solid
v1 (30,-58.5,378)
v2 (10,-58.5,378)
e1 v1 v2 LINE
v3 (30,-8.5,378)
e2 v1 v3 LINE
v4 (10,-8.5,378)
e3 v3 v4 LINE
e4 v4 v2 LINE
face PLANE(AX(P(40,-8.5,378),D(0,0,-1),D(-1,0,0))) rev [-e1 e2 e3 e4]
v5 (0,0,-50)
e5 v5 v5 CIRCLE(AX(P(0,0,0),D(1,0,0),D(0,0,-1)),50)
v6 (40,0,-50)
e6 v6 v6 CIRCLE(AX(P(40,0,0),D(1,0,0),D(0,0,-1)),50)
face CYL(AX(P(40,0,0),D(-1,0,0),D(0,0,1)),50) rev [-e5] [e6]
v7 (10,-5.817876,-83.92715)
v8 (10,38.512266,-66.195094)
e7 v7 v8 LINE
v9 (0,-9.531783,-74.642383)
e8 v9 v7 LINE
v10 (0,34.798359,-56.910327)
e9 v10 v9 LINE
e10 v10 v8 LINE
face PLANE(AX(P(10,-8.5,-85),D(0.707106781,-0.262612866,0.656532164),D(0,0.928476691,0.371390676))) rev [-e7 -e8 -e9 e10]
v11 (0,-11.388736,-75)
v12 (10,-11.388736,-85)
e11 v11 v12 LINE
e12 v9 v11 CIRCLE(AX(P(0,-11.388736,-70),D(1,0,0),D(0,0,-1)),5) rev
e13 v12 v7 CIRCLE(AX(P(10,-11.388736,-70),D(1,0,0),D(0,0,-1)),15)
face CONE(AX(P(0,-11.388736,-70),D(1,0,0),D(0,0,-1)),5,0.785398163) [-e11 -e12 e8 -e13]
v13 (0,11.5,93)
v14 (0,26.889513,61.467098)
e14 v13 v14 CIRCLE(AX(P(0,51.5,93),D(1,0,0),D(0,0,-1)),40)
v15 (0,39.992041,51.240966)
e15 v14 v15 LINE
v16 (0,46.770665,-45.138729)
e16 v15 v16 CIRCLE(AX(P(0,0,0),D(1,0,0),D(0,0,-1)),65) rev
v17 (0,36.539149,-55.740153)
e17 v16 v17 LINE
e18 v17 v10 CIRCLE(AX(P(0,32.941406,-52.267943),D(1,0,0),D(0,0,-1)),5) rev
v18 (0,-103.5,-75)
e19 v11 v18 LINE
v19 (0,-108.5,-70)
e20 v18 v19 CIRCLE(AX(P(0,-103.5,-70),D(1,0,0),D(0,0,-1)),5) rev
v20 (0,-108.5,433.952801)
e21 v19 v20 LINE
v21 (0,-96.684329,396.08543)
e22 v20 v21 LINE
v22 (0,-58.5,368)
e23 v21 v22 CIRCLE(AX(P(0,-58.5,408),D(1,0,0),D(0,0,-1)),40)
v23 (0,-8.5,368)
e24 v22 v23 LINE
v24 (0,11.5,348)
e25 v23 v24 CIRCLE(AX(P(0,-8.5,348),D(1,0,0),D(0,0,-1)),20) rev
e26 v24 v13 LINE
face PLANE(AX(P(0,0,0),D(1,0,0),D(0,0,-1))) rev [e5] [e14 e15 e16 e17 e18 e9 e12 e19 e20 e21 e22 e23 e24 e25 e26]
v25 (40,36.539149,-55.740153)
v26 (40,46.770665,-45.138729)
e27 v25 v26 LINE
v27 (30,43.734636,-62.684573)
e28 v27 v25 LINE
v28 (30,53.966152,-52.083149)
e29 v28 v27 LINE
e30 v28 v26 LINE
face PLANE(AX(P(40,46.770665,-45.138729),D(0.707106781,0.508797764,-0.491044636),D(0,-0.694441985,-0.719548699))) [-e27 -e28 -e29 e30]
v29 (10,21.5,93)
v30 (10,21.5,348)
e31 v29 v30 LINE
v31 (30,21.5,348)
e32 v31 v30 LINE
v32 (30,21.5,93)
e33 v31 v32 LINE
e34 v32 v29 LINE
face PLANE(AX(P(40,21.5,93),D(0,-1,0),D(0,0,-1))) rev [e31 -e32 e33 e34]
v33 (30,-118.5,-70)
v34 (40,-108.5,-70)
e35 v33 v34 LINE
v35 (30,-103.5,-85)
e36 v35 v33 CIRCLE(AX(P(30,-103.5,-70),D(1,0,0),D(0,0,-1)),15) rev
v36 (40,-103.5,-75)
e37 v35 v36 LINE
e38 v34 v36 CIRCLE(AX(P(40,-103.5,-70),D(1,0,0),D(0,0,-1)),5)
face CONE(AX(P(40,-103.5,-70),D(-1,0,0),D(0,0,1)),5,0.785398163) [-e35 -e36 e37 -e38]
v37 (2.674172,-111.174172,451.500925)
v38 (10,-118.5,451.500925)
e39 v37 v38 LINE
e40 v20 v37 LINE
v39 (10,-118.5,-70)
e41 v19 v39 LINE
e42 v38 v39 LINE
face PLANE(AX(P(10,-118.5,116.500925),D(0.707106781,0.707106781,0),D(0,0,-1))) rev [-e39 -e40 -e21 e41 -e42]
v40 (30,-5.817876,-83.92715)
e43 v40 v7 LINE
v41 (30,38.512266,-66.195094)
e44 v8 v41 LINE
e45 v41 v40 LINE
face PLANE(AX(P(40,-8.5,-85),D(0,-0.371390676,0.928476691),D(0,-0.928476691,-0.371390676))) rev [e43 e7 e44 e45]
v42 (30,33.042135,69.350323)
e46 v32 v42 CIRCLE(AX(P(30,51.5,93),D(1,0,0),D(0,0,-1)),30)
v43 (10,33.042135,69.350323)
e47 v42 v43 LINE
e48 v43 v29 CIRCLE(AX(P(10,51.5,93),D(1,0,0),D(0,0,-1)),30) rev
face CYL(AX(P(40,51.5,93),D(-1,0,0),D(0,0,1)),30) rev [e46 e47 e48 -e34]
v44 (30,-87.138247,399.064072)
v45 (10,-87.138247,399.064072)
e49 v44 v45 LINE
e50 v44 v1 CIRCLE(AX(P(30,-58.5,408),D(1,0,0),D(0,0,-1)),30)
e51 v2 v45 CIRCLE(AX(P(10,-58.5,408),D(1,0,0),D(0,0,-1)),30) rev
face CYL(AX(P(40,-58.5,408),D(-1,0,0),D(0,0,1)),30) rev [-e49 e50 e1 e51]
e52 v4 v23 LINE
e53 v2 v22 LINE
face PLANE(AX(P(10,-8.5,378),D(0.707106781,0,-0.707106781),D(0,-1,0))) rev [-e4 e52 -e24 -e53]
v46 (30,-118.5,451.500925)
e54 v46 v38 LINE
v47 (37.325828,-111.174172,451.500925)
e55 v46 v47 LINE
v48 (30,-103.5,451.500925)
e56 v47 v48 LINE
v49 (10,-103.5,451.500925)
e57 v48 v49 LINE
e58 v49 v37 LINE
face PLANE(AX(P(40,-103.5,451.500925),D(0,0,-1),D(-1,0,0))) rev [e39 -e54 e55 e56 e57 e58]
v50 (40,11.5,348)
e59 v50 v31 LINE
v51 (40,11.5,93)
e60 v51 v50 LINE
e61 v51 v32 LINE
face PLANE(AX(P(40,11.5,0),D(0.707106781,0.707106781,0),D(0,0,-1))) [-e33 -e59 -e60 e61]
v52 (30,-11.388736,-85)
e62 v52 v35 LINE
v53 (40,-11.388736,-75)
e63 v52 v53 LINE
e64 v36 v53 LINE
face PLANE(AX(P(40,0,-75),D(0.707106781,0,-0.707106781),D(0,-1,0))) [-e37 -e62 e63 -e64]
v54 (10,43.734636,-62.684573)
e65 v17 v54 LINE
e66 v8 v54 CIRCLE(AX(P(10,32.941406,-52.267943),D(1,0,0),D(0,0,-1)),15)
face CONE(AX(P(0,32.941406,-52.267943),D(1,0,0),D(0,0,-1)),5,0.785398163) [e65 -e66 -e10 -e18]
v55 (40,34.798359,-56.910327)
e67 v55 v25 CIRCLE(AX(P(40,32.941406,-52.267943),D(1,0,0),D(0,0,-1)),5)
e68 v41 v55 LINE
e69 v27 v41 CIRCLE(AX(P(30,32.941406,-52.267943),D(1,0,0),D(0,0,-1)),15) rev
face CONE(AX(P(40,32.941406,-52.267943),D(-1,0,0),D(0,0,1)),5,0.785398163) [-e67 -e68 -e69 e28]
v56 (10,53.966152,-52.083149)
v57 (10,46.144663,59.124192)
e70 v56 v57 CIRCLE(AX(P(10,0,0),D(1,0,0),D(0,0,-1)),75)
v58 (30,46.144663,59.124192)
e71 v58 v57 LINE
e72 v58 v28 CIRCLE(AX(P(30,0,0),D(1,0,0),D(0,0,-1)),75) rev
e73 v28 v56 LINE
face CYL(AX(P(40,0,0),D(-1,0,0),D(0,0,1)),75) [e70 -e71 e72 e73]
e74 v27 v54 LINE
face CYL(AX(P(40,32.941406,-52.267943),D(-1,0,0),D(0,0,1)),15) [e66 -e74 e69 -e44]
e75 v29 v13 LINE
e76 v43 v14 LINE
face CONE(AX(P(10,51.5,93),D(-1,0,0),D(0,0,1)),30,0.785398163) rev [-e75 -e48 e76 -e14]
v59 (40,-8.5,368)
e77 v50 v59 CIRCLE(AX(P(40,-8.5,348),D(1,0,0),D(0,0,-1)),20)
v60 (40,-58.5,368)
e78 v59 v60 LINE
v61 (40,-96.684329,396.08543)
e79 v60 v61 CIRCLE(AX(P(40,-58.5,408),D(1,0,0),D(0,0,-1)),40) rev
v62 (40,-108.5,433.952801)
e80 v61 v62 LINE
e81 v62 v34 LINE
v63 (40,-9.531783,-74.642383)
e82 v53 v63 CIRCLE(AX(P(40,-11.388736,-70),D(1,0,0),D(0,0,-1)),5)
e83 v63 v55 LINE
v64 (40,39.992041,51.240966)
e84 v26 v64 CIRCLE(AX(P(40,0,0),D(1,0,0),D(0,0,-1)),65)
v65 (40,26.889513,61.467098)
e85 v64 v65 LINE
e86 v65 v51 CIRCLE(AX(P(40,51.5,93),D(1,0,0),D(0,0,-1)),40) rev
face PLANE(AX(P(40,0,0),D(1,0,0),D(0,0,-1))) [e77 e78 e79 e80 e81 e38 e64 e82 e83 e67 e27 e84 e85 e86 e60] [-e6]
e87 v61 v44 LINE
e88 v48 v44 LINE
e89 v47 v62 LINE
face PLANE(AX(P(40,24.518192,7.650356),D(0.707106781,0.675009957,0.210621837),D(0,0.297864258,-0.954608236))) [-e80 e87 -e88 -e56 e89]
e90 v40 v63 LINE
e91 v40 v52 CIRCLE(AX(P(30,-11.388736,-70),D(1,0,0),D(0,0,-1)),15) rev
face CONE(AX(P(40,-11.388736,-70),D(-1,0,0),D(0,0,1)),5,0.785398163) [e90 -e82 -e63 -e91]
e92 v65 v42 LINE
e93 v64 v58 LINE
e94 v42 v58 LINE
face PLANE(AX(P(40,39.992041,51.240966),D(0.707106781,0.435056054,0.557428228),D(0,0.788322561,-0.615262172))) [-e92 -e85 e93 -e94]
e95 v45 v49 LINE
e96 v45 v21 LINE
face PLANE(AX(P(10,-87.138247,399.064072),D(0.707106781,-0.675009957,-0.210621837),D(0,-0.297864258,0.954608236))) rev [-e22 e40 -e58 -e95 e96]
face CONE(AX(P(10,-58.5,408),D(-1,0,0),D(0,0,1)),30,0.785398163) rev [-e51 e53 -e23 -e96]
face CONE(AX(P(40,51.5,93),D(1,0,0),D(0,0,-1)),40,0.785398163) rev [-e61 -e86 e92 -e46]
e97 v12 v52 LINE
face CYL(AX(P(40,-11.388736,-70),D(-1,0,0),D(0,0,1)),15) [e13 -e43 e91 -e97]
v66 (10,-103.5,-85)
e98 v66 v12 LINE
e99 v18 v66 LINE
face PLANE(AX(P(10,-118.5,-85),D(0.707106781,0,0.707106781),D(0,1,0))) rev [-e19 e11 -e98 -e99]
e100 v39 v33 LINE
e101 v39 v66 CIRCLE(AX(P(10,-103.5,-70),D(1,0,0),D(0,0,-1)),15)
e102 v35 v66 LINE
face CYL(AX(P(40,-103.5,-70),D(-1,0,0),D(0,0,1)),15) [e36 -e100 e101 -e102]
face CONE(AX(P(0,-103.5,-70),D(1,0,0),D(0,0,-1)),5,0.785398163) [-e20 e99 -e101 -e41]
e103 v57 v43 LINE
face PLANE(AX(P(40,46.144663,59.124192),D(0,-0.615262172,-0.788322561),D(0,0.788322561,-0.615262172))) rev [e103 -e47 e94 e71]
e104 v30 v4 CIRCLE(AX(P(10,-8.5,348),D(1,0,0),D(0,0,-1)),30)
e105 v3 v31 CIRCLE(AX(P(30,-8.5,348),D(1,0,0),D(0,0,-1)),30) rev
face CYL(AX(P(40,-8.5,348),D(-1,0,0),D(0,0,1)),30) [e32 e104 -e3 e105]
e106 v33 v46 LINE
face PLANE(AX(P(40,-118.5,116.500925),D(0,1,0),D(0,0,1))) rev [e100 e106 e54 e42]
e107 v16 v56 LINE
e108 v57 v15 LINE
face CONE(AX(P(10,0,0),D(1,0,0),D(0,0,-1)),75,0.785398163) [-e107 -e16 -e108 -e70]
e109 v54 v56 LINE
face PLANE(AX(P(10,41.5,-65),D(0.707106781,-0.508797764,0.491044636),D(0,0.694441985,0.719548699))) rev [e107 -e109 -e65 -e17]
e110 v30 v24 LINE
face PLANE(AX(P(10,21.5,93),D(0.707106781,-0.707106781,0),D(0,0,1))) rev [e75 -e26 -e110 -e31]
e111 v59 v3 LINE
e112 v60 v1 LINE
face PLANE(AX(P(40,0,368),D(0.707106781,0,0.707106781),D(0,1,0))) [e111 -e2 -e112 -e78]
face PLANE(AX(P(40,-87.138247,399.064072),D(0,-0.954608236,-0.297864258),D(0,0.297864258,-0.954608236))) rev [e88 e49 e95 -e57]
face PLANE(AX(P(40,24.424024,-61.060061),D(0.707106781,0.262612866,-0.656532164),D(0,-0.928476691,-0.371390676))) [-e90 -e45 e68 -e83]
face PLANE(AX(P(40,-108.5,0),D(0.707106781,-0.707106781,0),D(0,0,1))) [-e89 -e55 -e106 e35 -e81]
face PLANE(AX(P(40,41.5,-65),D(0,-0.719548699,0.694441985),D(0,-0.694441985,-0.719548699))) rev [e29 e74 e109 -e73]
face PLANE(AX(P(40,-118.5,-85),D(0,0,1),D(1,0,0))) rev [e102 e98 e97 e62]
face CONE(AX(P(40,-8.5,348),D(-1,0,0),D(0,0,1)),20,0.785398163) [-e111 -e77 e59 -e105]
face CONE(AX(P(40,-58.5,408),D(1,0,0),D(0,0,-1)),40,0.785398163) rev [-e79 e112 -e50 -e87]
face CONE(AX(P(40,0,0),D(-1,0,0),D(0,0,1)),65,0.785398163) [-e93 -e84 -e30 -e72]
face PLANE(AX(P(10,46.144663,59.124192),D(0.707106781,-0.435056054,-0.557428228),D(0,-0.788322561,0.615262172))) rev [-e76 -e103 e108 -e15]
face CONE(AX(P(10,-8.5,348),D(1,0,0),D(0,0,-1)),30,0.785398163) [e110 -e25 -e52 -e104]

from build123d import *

# Parameters (mm, degrees)
SKETCH_1_R      = 50
EXTRUDE_1_DEPTH = 40
FILLET_1_R      = 15
FILLET_2_R      = 15
CHAMFER_1_SIZE  = 10


with BuildPart() as part:
    # 草图1 → 凸台-拉伸1 (new body)
    with BuildSketch(Plane(origin=(0, 0, 0), x_dir=(0, 0, -1), z_dir=(1, 0, 0))):
        with BuildLine():
            Line((85, -8.5), (65, 41.5))
            Line((65, 41.5), (52.08314884, 53.966152419))
            ThreePointArc((52.08314884, 53.966152419), (-5.26193851, 74.815185645), (-59.124192044, 46.14466291))
            Line((-59.124192044, 46.14466291), (-69.350323182, 33.042134836))
            ThreePointArc((-69.350323182, 33.042134836), (-79.842035775, 24.539510808), (-93, 21.5))
            Line((-93, 21.5), (-348, 21.5))
            ThreePointArc((-348, 21.5), (-369.213203436, 12.713203436), (-378, -8.5))
            Line((-378, -8.5), (-378, -58.5))
            ThreePointArc((-378, -58.5), (-383.833102889, -76.275294204), (-399.064072268, -87.138247076))
            Line((-399.064072268, -87.138247076), (-451.500924593, -103.5))
            Line((-451.500924593, -103.5), (-451.500924593, -118.5))
            Line((-451.500924593, -118.5), (-116.500924593, -118.5))
            Line((-116.500924593, -118.5), (85, -118.5))
            Line((85, -118.5), (85, -8.5))
        make_face()
        Circle(SKETCH_1_R, mode=Mode.SUBTRACT)
    extrude(amount=EXTRUDE_1_DEPTH)

    # 圆角1
    fillet_1_edges = [part.edges().sort_by_distance(p)[0] for p in [
        (20, -118.5, -85),
    ]]
    fillet(fillet_1_edges, radius=FILLET_1_R)

    # 圆角2
    fillet_2_edges = [part.edges().sort_by_distance(p)[0] for p in [
        (20, 41.5, -65),
        (20, -8.5, -85),
    ]]
    fillet(fillet_2_edges, radius=FILLET_2_R)

    # 倒角1
    # the kernel refuses this chamfer: 10 mm, written as the material it takes off along each edge
    with BuildSketch(Plane(origin=(40, -118.5, -70), x_dir=(0.027495876610586317, 0.9996219169112968, 0), z_dir=(0, 0, 1))) as chamfer_1_piece_1:
        Polygon((CHAMFER_1_SIZE * 0.999621916911, CHAMFER_1_SIZE * 0.0274958766106), (-CHAMFER_1_SIZE * 0.0274958766106, CHAMFER_1_SIZE * 0.999621916911), (0, 0), align=None)
    extrude(amount=547.217754472, mode=Mode.SUBTRACT)
    with BuildSketch(Plane(origin=(0, -118.5, 477.217754472), x_dir=(0.9996219169112968, -0.027495876610586317, 0), z_dir=(0, 0, -1))) as chamfer_1_piece_2:
        Polygon((CHAMFER_1_SIZE * 0.999621916911, -CHAMFER_1_SIZE * 0.0274958766106), (-CHAMFER_1_SIZE * 0.0274958766106, -CHAMFER_1_SIZE * 0.999621916911), (0, 0), align=None)
    extrude(amount=547.217754472, mode=Mode.SUBTRACT)
    with BuildSketch(Plane(origin=(40, -87.138247076, 399.064072268), x_dir=(0.02749587661058635, -0.9542473146313191, -0.2977516402781551), z_dir=(0, -0.297864257716727, 0.9546082358616352)), Plane(origin=(0, -87.138247076, 399.064072268), x_dir=(0.9996219169112968, 0.026247790264700862, 0.008190038876882964), z_dir=(0, -0.297864257716727, 0.9546082358616352))) as chamfer_1_piece_3:
        Polygon((CHAMFER_1_SIZE * 0.999621916911, -CHAMFER_1_SIZE * 0.0274958766106), (-CHAMFER_1_SIZE * 0.0274958766106, -CHAMFER_1_SIZE * 0.999621916911), (0, 0), align=None)
    extrude(amount=80.647062361, mode=Mode.SUBTRACT)
    with BuildSketch(Plane(origin=(40, -58.5, 408), x_dir=(0, 0, -1), z_dir=(0, 1, 0))) as chamfer_1_piece_4:
        Polygon((30 + CHAMFER_1_SIZE, 0), (30, CHAMFER_1_SIZE), (30, 0), align=None)
    revolve(axis=Axis((40, -58.5, 408), (-1, 0, 0)), revolution_arc=72.670629443, mode=Mode.SUBTRACT)
    with BuildSketch(Plane(origin=(40, -8.5, 378), x_dir=(0.027495876610586282, 0, -0.9996219169112968), z_dir=(0, -1, 0)), Plane(origin=(0, -8.5, 378), x_dir=(0.9996219169112968, 0, 0.0274958766105877), z_dir=(0, -1, 0))) as chamfer_1_piece_5:
        Polygon((CHAMFER_1_SIZE * 0.999621916911, -CHAMFER_1_SIZE * 0.0274958766106), (-CHAMFER_1_SIZE * 0.0274958766106, -CHAMFER_1_SIZE * 0.999621916911), (0, 0), align=None)
    extrude(amount=50, mode=Mode.SUBTRACT)
    with BuildSketch(Plane(origin=(40, -8.5, 348), x_dir=(0, 1, 0), z_dir=(0, 0, -1))) as chamfer_1_piece_6:
        Polygon((30 - CHAMFER_1_SIZE, 0), (30, -CHAMFER_1_SIZE), (30, 0), align=None)
    revolve(axis=Axis((40, -8.5, 348), (1, 0, 0)), revolution_arc=90, mode=Mode.SUBTRACT)
    with BuildSketch(Plane(origin=(40, 21.5, 93), x_dir=(0.027495876610586317, -0.9996219169112968, 0), z_dir=(0, 0, 1)), Plane(origin=(0, 21.5, 93), x_dir=(0.9996219169112968, 0.027495876610586317, 0), z_dir=(0, 0, 1))) as chamfer_1_piece_7:
        Polygon((CHAMFER_1_SIZE * 0.999621916911, -CHAMFER_1_SIZE * 0.0274958766106), (-CHAMFER_1_SIZE * 0.0274958766106, -CHAMFER_1_SIZE * 0.999621916911), (0, 0), align=None)
    extrude(amount=255, mode=Mode.SUBTRACT)
    with BuildSketch(Plane(origin=(40, 51.5, 93), x_dir=(0, -0.6152621721387623, -0.7883225605899479), z_dir=(0, 0.7883225605899479, -0.6152621721387623))) as chamfer_1_piece_8:
        Polygon((30 + CHAMFER_1_SIZE, 0), (30, CHAMFER_1_SIZE), (30, 0), align=None)
    revolve(axis=Axis((40, 51.5, 93), (-1, 0, 0)), revolution_arc=52.029027347, mode=Mode.SUBTRACT)
    with BuildSketch(Plane(origin=(40, 46.14466291, 59.124192044), x_dir=(0.027495876610586327, -0.6150295519163572, -0.788024509161346), z_dir=(0, -0.7883225605899483, 0.6152621721387617)), Plane(origin=(0, 46.14466291, 59.124192044), x_dir=(0.9996219169112968, 0.016917172768288757, 0.021675619855322733), z_dir=(0, -0.7883225605899483, 0.6152621721387617))) as chamfer_1_piece_9:
        Polygon((CHAMFER_1_SIZE * 0.999621916911, -CHAMFER_1_SIZE * 0.0274958766106), (-CHAMFER_1_SIZE * 0.0274958766106, -CHAMFER_1_SIZE * 0.999621916911), (0, 0), align=None)
    extrude(amount=16.620770139, mode=Mode.SUBTRACT)
    with BuildSketch(Plane(origin=(40, 0, 0), x_dir=(0, 0.7195486989139618, -0.6944419845395472), z_dir=(0, -0.6944419845395472, -0.7195486989139618))) as chamfer_1_piece_10:
        Polygon((75 - CHAMFER_1_SIZE, 0), (75, -CHAMFER_1_SIZE), (75, 0), align=None)
    revolve(axis=Axis((40, 0, 0), (1, 0, 0)), revolution_arc=96.011794601, mode=Mode.SUBTRACT)
    with BuildSketch(Plane(origin=(40, 43.734636446, -62.684572962), x_dir=(0.027495876610586317, -0.7192766497194039, 0.6941794277691075), z_dir=(0, 0.6944419845395474, 0.7195486989139617)), Plane(origin=(0, 43.734636446, -62.684572962), x_dir=(0.9996219169112968, 0.019784622240646275, -0.019094291120110143), z_dir=(0, 0.6944419845395474, 0.7195486989139617))) as chamfer_1_piece_11:
        Polygon((CHAMFER_1_SIZE * 0.999621916911, -CHAMFER_1_SIZE * 0.0274958766106), (-CHAMFER_1_SIZE * 0.0274958766106, -CHAMFER_1_SIZE * 0.999621916911), (0, 0), align=None)
    extrude(amount=14.733435189, mode=Mode.SUBTRACT)
    with BuildSketch(Plane(origin=(40, 32.941405963, -52.267943193), x_dir=(0, 0.3713906763541047, -0.9284766908852589), z_dir=(0, -0.9284766908852589, -0.3713906763541047))) as chamfer_1_piece_12:
        Polygon((15 - CHAMFER_1_SIZE, 0), (15, -CHAMFER_1_SIZE), (15, 0), align=None)
    revolve(axis=Axis((40, 32.941405963, -52.267943193), (1, 0, 0)), revolution_arc=24.215823259, mode=Mode.SUBTRACT)
    with BuildSketch(Plane(origin=(40, -5.817875908, -83.927150363), x_dir=(0.027495876610586313, -0.37125025982007287, 0.9281256495501801), z_dir=(0, 0.9284766908852591, 0.37139067635410444)), Plane(origin=(0, -5.817875908, -83.927150363), x_dir=(0.9996219169112968, 0.010211712211354702, -0.025529280528386704), z_dir=(0, 0.9284766908852591, 0.37139067635410444))) as chamfer_1_piece_13:
        Polygon((CHAMFER_1_SIZE * 0.999621916911, -CHAMFER_1_SIZE * 0.0274958766106), (-CHAMFER_1_SIZE * 0.0274958766106, -CHAMFER_1_SIZE * 0.999621916911), (0, 0), align=None)
    extrude(amount=47.745024136, mode=Mode.SUBTRACT)
    with BuildSketch(Plane(origin=(40, -11.388736054, -70), x_dir=(0, 0, -1), z_dir=(0, -1, 0))) as chamfer_1_piece_14:
        Polygon((15 - CHAMFER_1_SIZE, 0), (15, -CHAMFER_1_SIZE), (15, 0), align=None)
    revolve(axis=Axis((40, -11.388736054, -70), (1, 0, 0)), revolution_arc=21.801409486, mode=Mode.SUBTRACT)
    with BuildSketch(Plane(origin=(40, -103.5, -85), x_dir=(0.027495876610586282, 0, 0.9996219169112968), z_dir=(0, 1, 0)), Plane(origin=(0, -103.5, -85), x_dir=(0.9996219169112968, 0, -0.027495876610586317), z_dir=(0, 1, 0))) as chamfer_1_piece_15:
        Polygon((CHAMFER_1_SIZE * 0.999621916911, -CHAMFER_1_SIZE * 0.0274958766106), (-CHAMFER_1_SIZE * 0.0274958766106, -CHAMFER_1_SIZE * 0.999621916911), (0, 0), align=None)
    extrude(amount=92.111263946, mode=Mode.SUBTRACT)
    with BuildSketch(Plane(origin=(40, -103.5, -70), x_dir=(0, -1, 0), z_dir=(0, 0, 1))) as chamfer_1_piece_16:
        Polygon((15 - CHAMFER_1_SIZE, 0), (15, -CHAMFER_1_SIZE), (15, 0), align=None)
    revolve(axis=Axis((40, -103.5, -70), (1, 0, 0)), revolution_arc=90, mode=Mode.SUBTRACT)
    with BuildSketch(Plane(origin=(0, -58.5, 408), x_dir=(0, 0, -1), z_dir=(0, 1, 0))) as chamfer_1_piece_17:
        Polygon((30, -CHAMFER_1_SIZE), (30 + CHAMFER_1_SIZE, 0), (30, 0), align=None)
    revolve(axis=Axis((0, -58.5, 408), (-1, 0, 0)), revolution_arc=72.670629443, mode=Mode.SUBTRACT)
    with BuildSketch(Plane(origin=(0, -8.5, 348), x_dir=(0, 1, 0), z_dir=(0, 0, -1))) as chamfer_1_piece_18:
        Polygon((30, CHAMFER_1_SIZE), (30 - CHAMFER_1_SIZE, 0), (30, 0), align=None)
    revolve(axis=Axis((0, -8.5, 348), (1, 0, 0)), revolution_arc=90, mode=Mode.SUBTRACT)
    with BuildSketch(Plane(origin=(0, 51.5, 93), x_dir=(0, -0.6152621721387623, -0.7883225605899479), z_dir=(0, 0.7883225605899479, -0.6152621721387623))) as chamfer_1_piece_19:
        Polygon((30, -CHAMFER_1_SIZE), (30 + CHAMFER_1_SIZE, 0), (30, 0), align=None)
    revolve(axis=Axis((0, 51.5, 93), (-1, 0, 0)), revolution_arc=52.029027347, mode=Mode.SUBTRACT)
    with BuildSketch(Plane(origin=(0, 0, 0), x_dir=(0, 0.7195486989139618, -0.6944419845395472), z_dir=(0, -0.6944419845395472, -0.7195486989139618))) as chamfer_1_piece_20:
        Polygon((75, CHAMFER_1_SIZE), (75 - CHAMFER_1_SIZE, 0), (75, 0), align=None)
    revolve(axis=Axis((0, 0, 0), (1, 0, 0)), revolution_arc=96.011794601, mode=Mode.SUBTRACT)
    with BuildSketch(Plane(origin=(0, 32.941405963, -52.267943193), x_dir=(0, 0.3713906763541047, -0.9284766908852589), z_dir=(0, -0.9284766908852589, -0.3713906763541047))) as chamfer_1_piece_21:
        Polygon((15, CHAMFER_1_SIZE), (15 - CHAMFER_1_SIZE, 0), (15, 0), align=None)
    revolve(axis=Axis((0, 32.941405963, -52.267943193), (1, 0, 0)), revolution_arc=24.215823259, mode=Mode.SUBTRACT)
    with BuildSketch(Plane(origin=(0, -11.388736054, -70), x_dir=(0, 0, -1), z_dir=(0, -1, 0))) as chamfer_1_piece_22:
        Polygon((15, CHAMFER_1_SIZE), (15 - CHAMFER_1_SIZE, 0), (15, 0), align=None)
    revolve(axis=Axis((0, -11.388736054, -70), (1, 0, 0)), revolution_arc=21.801409486, mode=Mode.SUBTRACT)
    with BuildSketch(Plane(origin=(0, -103.5, -70), x_dir=(0, -1, 0), z_dir=(0, 0, 1))) as chamfer_1_piece_23:
        Polygon((15, CHAMFER_1_SIZE), (15 - CHAMFER_1_SIZE, 0), (15, 0), align=None)
    revolve(axis=Axis((0, -103.5, -70), (1, 0, 0)), revolution_arc=90, mode=Mode.SUBTRACT)


solid = part.part
